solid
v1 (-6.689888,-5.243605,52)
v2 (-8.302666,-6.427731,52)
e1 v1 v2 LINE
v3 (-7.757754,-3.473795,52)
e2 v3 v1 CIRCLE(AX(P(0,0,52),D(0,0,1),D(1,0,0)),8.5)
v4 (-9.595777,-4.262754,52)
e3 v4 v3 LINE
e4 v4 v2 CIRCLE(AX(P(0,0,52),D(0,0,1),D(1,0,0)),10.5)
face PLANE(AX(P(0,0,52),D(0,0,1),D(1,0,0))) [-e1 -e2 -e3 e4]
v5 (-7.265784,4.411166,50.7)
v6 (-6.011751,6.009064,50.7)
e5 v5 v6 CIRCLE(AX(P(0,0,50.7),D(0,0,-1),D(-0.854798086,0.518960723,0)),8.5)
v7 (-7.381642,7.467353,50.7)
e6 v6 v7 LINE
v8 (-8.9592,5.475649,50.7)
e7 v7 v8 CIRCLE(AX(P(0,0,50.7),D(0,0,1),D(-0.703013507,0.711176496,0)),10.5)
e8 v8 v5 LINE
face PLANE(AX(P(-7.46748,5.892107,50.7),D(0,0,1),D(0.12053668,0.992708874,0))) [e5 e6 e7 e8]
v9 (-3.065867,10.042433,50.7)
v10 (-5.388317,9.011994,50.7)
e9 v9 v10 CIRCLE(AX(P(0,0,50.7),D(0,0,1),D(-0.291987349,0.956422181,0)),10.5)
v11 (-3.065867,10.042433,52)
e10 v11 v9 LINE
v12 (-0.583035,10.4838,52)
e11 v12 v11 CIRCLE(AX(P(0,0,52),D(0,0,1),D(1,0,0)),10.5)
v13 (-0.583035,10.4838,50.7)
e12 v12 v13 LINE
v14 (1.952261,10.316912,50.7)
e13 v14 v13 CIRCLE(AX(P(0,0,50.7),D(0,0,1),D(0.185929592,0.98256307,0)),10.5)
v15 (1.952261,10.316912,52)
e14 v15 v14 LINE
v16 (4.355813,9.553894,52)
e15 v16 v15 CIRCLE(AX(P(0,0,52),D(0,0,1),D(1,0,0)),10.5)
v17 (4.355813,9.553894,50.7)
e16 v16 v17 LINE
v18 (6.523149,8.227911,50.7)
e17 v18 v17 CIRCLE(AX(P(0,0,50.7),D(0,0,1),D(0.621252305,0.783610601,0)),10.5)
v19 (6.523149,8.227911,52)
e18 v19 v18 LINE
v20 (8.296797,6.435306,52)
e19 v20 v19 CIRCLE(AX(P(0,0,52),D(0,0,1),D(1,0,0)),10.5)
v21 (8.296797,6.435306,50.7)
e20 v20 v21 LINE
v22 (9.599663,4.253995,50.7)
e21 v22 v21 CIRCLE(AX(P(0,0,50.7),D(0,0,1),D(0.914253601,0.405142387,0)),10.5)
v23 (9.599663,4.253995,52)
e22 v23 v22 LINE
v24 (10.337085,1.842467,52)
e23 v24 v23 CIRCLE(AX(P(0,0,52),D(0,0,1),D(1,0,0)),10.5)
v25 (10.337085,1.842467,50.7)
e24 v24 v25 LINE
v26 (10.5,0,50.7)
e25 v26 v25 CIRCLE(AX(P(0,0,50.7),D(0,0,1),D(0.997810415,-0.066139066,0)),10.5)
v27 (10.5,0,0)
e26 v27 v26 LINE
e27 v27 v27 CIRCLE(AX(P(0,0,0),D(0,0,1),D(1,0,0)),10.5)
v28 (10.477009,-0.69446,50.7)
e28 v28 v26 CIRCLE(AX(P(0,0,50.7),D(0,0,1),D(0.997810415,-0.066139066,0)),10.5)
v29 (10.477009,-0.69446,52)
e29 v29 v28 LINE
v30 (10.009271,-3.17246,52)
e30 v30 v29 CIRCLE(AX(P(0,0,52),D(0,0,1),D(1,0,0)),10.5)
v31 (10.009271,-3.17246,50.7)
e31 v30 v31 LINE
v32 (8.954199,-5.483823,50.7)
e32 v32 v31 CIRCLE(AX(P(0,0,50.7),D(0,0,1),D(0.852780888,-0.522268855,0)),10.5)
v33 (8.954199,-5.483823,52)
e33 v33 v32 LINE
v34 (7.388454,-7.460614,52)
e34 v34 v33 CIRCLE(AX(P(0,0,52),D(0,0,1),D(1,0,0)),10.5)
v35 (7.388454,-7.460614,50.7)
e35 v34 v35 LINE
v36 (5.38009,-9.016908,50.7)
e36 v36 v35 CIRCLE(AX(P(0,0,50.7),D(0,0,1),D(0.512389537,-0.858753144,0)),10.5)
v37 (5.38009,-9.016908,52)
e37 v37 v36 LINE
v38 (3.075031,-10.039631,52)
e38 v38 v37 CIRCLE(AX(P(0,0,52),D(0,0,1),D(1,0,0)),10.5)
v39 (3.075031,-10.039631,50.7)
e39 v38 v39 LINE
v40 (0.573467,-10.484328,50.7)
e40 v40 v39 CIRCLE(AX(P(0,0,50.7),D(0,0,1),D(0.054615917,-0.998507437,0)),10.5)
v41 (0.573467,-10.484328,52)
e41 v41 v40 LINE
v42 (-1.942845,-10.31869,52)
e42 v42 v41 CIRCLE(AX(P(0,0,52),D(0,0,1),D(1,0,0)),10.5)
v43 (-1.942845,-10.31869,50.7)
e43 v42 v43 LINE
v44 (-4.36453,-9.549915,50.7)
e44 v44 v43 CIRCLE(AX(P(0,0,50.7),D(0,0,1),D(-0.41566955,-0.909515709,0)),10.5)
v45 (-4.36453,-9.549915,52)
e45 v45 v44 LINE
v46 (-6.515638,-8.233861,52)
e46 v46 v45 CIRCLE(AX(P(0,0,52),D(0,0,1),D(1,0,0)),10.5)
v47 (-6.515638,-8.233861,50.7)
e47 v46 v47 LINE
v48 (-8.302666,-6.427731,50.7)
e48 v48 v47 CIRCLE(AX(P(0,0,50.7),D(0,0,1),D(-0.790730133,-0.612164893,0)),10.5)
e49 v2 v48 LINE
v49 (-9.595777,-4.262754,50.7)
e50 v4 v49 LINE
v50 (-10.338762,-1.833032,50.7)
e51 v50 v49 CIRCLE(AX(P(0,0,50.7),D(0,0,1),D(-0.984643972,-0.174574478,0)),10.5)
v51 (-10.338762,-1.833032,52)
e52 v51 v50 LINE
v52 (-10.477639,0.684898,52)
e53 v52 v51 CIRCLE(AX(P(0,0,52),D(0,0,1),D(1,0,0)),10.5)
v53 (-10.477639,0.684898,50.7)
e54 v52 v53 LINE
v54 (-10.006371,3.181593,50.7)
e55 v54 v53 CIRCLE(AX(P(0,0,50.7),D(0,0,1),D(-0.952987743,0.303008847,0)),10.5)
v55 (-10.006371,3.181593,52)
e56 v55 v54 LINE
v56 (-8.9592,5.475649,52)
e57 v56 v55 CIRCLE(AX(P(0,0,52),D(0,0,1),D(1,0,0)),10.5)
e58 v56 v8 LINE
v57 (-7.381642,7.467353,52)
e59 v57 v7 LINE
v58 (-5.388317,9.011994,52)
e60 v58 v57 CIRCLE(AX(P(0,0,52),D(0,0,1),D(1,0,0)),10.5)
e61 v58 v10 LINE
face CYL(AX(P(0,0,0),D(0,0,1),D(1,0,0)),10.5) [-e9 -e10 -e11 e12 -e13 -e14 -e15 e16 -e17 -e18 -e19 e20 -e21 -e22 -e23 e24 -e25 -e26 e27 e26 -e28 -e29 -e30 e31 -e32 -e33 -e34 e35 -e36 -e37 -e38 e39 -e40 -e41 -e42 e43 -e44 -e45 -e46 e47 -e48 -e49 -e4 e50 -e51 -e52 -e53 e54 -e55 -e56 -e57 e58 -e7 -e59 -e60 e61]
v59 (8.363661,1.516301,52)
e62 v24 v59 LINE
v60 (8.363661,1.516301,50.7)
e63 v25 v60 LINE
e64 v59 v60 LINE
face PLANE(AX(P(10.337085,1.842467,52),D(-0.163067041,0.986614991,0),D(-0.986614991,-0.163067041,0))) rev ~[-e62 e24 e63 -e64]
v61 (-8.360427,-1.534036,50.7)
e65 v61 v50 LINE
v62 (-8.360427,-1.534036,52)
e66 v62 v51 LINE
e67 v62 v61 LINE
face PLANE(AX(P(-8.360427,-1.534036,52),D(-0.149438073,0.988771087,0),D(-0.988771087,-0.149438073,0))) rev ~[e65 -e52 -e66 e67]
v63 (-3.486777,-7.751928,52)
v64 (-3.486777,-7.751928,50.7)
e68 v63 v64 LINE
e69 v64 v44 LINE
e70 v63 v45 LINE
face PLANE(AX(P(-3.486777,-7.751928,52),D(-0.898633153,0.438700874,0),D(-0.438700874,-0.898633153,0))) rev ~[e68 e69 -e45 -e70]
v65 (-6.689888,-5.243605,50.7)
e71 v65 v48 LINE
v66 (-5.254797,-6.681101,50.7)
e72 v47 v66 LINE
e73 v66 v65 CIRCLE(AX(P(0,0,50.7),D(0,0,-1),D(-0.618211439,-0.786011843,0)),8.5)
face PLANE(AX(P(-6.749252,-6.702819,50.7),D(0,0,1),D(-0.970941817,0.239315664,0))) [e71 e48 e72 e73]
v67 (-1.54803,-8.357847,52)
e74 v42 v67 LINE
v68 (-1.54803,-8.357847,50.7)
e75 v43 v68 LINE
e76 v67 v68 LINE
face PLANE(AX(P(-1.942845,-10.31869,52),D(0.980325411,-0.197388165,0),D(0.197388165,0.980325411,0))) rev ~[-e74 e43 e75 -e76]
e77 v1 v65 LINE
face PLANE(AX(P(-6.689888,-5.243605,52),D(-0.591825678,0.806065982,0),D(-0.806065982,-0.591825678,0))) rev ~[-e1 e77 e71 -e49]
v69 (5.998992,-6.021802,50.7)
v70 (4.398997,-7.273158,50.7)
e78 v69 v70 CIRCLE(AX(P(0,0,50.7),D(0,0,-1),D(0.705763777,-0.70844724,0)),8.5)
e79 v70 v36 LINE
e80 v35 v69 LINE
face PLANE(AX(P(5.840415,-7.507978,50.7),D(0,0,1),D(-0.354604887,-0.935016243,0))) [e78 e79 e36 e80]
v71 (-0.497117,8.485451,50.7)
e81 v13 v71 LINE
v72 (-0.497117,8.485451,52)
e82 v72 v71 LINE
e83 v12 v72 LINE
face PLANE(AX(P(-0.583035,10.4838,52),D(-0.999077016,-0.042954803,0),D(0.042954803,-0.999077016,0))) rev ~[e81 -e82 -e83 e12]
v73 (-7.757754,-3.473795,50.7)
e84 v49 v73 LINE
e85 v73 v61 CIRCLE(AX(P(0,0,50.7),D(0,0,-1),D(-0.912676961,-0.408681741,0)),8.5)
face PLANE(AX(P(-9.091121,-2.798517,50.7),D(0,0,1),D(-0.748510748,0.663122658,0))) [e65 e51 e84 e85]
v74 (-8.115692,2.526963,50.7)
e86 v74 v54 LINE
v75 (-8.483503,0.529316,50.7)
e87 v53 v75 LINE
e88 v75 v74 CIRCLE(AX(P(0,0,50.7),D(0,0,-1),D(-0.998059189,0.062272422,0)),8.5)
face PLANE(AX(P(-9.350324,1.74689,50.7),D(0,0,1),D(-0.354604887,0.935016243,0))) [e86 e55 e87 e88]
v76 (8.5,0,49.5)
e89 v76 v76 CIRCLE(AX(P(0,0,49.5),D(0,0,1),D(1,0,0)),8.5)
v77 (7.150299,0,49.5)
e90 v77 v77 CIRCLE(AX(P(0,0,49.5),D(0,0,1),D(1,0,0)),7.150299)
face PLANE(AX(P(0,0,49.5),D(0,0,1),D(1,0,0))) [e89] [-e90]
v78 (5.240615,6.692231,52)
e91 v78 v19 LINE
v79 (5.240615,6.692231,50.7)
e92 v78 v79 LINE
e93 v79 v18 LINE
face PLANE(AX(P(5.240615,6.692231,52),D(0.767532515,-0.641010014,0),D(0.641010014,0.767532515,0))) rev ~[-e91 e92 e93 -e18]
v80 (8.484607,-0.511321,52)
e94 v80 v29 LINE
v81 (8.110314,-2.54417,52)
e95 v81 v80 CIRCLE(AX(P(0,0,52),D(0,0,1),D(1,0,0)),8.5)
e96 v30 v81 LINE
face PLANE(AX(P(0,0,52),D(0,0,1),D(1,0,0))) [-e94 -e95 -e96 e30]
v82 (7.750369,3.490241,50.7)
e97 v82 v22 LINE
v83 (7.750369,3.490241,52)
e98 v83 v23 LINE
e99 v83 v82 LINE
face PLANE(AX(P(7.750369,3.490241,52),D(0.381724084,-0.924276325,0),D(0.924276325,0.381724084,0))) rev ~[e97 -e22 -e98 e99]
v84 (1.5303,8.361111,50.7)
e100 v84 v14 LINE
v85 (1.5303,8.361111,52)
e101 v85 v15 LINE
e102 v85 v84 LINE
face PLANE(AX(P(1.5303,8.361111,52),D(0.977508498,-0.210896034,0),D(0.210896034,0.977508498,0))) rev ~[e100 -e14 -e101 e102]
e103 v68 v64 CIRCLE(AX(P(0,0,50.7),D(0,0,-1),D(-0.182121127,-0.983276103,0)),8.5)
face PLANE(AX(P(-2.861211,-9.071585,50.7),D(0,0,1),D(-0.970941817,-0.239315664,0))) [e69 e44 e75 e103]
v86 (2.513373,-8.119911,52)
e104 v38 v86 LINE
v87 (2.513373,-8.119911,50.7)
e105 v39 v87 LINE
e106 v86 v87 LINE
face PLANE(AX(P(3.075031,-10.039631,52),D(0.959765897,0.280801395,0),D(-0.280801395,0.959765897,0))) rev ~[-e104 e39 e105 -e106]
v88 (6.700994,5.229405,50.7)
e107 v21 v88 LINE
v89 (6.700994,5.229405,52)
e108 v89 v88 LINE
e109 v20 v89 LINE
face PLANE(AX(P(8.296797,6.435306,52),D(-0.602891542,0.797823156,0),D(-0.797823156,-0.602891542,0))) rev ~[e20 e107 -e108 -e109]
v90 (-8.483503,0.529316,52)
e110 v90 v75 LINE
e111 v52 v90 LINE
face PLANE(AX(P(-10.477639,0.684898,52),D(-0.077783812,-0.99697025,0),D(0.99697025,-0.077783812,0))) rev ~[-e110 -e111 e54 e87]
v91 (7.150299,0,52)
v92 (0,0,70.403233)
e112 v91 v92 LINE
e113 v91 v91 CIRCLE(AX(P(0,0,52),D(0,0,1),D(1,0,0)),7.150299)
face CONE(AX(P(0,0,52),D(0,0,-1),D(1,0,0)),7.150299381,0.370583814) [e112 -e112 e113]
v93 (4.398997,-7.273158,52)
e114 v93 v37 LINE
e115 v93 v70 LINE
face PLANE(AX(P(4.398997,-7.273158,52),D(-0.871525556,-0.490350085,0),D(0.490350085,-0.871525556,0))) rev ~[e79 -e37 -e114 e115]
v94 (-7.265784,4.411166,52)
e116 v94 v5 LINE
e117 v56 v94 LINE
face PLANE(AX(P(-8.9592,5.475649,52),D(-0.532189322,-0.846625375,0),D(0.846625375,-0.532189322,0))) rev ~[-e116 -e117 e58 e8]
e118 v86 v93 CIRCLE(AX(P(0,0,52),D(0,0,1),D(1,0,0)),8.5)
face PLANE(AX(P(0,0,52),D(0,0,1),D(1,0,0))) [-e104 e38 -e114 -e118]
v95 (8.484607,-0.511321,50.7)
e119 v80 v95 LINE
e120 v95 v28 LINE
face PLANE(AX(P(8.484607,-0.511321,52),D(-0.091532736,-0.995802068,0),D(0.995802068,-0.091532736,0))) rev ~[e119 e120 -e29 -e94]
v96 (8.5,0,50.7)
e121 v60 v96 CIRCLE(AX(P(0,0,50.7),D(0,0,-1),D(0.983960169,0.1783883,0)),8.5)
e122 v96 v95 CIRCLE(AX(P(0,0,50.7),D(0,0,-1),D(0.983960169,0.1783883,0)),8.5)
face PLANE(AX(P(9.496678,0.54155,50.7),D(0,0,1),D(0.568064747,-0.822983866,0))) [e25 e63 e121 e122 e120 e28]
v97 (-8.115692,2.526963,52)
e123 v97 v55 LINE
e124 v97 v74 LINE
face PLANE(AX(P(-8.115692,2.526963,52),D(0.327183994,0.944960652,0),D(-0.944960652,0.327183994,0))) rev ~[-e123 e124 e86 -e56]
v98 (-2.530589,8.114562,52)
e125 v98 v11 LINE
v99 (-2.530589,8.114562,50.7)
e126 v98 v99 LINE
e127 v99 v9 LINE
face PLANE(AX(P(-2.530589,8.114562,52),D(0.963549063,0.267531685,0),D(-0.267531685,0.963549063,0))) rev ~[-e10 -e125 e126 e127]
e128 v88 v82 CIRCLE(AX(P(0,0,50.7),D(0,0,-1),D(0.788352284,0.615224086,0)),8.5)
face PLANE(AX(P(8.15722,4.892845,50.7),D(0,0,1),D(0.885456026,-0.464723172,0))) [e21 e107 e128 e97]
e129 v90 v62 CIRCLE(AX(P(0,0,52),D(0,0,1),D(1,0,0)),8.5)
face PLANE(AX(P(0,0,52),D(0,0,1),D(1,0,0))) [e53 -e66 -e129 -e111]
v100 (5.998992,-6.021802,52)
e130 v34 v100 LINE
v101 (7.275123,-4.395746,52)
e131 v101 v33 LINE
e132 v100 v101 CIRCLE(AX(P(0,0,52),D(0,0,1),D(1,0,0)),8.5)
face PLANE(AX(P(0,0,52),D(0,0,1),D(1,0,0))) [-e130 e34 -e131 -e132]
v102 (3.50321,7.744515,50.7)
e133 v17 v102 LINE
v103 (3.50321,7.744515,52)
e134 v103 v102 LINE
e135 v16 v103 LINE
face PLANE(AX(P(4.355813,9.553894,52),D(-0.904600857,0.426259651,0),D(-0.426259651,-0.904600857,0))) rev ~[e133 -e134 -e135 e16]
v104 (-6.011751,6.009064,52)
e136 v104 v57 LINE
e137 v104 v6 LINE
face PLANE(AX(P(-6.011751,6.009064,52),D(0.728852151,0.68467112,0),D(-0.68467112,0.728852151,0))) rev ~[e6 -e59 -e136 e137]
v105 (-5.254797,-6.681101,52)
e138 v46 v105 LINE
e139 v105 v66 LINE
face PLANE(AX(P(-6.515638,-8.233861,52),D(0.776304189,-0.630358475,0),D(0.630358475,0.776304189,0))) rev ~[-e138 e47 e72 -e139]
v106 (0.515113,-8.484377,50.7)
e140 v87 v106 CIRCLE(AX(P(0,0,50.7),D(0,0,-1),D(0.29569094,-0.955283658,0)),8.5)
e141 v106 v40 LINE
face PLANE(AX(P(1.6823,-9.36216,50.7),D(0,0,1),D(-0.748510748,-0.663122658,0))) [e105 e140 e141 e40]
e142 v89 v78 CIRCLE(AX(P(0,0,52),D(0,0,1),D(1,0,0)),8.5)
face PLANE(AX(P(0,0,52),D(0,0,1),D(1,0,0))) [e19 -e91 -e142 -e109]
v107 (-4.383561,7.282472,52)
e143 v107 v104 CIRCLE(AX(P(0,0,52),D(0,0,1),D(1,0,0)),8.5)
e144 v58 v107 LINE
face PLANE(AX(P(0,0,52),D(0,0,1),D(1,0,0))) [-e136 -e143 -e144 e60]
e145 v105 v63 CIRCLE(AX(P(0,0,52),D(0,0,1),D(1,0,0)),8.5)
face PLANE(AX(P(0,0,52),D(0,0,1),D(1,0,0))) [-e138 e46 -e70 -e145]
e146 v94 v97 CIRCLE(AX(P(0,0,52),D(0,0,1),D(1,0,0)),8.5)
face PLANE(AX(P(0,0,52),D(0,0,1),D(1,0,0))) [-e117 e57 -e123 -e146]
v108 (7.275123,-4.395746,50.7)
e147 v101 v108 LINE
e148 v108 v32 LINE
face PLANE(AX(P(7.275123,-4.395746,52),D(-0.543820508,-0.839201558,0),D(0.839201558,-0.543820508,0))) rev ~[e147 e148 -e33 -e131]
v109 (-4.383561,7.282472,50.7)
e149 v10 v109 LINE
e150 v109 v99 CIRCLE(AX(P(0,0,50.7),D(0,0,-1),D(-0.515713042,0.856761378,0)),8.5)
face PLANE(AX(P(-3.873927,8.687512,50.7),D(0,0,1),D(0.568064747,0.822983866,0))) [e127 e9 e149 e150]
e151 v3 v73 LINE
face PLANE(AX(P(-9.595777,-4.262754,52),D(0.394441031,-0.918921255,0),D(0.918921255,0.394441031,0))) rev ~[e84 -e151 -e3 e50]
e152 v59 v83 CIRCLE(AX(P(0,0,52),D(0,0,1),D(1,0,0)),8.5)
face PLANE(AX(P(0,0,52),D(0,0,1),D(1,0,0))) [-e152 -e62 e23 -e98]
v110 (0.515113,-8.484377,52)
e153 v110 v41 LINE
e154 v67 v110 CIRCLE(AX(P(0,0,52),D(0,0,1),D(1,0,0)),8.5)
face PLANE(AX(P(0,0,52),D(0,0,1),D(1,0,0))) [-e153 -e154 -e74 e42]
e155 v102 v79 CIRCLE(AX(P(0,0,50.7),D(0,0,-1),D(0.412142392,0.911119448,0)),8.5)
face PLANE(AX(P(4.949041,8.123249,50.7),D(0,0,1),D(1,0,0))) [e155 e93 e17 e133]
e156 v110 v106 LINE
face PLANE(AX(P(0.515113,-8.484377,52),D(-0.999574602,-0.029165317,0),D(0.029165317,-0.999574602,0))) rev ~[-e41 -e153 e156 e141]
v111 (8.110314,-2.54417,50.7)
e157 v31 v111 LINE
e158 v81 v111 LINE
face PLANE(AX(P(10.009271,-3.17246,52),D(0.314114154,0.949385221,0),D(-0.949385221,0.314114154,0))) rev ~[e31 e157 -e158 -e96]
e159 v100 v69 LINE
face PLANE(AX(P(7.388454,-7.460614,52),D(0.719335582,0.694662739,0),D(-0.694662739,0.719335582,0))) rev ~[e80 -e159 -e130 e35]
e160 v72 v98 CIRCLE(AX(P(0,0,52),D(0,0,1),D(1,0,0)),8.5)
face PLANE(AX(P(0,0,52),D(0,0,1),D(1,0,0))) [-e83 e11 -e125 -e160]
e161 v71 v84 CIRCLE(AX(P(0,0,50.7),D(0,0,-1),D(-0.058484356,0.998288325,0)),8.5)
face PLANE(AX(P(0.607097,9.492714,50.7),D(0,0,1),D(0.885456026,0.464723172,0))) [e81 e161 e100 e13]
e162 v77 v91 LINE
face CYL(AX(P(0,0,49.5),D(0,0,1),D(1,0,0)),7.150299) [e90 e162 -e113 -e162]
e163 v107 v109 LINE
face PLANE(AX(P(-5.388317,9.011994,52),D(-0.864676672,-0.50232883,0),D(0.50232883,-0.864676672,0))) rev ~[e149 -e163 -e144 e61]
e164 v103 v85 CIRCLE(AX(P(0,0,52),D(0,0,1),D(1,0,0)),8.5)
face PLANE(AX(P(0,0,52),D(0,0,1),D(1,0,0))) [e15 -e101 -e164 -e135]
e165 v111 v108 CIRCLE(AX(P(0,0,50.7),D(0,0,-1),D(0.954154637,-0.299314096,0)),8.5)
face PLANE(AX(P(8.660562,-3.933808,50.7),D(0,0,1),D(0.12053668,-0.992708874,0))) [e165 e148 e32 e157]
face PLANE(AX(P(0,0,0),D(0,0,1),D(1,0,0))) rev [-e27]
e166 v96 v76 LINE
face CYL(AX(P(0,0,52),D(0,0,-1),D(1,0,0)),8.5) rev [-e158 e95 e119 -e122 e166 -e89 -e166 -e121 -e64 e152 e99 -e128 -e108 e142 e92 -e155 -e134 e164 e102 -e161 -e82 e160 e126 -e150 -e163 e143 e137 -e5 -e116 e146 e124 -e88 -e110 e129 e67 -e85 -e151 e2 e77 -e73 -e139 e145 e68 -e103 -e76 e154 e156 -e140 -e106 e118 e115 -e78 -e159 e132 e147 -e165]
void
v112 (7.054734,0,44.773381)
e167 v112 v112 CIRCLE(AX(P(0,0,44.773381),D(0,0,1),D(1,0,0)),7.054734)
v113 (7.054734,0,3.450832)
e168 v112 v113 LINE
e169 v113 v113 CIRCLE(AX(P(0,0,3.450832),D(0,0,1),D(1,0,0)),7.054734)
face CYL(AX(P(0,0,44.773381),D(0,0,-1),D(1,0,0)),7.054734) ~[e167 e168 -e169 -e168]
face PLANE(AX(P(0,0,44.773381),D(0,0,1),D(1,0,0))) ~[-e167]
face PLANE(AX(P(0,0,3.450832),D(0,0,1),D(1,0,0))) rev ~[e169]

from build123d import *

# Parameters (mm, degrees)
F3_DEPTH        = 1.3
F3_COPIES_COUNT = 13


# Not quite as in the source:
# - a pattern or mirror of a feature is missing from the dataset's text; its kind, count and spacing are read off the source's solid


with BuildPart() as f1:
    # F0 (on Front) → F1 (revolve)
    with BuildSketch(Plane.XZ):
        Polygon((0, 3.4508320969), (0, 0), (10.5, 0), (10.5, 52), (8.5, 52), (8.5, 49.5), (7.1502993815, 49.5), (7.1502993815, 52), (0, 70.4032331705), (0, 44.7733812034), (7.0547335781, 44.7733812034), (7.0547335781, 3.4508320969), align=None)
    revolve(axis=Axis((0, 0, 35.2016165853), (0, 0, 1)))

    # F2 (on face) → F3 (cut)
    with BuildSketch(Plane.XY.offset(52)):
        with BuildLine():
            ThreePointArc((6.5231491988, 8.2279113103), (5.4797365468, 8.9567006971), (4.3558130739, 9.5538940995))
            Line((4.3558130739, 9.5538940995), (3.5032103316, 7.7445153091))
            ThreePointArc((3.5032103316, 7.7445153091), (4.4034584873, 7.2704575751), (5.2406151405, 6.6922307902))
            Line((5.2406151405, 6.6922307902), (6.5231491988, 8.2279113103))
        make_face()
    f3 = extrude(amount=-F3_DEPTH, mode=Mode.SUBTRACT)

    # F3_copies: F3 ×13 about axis
    f3_copies_axis = Axis((0, 0, 0), (0, 0, 1))
    for i in range(1, F3_COPIES_COUNT):
        add(f3.rotate(f3_copies_axis, i * 360 / F3_COPIES_COUNT), mode=Mode.SUBTRACT)


solid = f1.part
